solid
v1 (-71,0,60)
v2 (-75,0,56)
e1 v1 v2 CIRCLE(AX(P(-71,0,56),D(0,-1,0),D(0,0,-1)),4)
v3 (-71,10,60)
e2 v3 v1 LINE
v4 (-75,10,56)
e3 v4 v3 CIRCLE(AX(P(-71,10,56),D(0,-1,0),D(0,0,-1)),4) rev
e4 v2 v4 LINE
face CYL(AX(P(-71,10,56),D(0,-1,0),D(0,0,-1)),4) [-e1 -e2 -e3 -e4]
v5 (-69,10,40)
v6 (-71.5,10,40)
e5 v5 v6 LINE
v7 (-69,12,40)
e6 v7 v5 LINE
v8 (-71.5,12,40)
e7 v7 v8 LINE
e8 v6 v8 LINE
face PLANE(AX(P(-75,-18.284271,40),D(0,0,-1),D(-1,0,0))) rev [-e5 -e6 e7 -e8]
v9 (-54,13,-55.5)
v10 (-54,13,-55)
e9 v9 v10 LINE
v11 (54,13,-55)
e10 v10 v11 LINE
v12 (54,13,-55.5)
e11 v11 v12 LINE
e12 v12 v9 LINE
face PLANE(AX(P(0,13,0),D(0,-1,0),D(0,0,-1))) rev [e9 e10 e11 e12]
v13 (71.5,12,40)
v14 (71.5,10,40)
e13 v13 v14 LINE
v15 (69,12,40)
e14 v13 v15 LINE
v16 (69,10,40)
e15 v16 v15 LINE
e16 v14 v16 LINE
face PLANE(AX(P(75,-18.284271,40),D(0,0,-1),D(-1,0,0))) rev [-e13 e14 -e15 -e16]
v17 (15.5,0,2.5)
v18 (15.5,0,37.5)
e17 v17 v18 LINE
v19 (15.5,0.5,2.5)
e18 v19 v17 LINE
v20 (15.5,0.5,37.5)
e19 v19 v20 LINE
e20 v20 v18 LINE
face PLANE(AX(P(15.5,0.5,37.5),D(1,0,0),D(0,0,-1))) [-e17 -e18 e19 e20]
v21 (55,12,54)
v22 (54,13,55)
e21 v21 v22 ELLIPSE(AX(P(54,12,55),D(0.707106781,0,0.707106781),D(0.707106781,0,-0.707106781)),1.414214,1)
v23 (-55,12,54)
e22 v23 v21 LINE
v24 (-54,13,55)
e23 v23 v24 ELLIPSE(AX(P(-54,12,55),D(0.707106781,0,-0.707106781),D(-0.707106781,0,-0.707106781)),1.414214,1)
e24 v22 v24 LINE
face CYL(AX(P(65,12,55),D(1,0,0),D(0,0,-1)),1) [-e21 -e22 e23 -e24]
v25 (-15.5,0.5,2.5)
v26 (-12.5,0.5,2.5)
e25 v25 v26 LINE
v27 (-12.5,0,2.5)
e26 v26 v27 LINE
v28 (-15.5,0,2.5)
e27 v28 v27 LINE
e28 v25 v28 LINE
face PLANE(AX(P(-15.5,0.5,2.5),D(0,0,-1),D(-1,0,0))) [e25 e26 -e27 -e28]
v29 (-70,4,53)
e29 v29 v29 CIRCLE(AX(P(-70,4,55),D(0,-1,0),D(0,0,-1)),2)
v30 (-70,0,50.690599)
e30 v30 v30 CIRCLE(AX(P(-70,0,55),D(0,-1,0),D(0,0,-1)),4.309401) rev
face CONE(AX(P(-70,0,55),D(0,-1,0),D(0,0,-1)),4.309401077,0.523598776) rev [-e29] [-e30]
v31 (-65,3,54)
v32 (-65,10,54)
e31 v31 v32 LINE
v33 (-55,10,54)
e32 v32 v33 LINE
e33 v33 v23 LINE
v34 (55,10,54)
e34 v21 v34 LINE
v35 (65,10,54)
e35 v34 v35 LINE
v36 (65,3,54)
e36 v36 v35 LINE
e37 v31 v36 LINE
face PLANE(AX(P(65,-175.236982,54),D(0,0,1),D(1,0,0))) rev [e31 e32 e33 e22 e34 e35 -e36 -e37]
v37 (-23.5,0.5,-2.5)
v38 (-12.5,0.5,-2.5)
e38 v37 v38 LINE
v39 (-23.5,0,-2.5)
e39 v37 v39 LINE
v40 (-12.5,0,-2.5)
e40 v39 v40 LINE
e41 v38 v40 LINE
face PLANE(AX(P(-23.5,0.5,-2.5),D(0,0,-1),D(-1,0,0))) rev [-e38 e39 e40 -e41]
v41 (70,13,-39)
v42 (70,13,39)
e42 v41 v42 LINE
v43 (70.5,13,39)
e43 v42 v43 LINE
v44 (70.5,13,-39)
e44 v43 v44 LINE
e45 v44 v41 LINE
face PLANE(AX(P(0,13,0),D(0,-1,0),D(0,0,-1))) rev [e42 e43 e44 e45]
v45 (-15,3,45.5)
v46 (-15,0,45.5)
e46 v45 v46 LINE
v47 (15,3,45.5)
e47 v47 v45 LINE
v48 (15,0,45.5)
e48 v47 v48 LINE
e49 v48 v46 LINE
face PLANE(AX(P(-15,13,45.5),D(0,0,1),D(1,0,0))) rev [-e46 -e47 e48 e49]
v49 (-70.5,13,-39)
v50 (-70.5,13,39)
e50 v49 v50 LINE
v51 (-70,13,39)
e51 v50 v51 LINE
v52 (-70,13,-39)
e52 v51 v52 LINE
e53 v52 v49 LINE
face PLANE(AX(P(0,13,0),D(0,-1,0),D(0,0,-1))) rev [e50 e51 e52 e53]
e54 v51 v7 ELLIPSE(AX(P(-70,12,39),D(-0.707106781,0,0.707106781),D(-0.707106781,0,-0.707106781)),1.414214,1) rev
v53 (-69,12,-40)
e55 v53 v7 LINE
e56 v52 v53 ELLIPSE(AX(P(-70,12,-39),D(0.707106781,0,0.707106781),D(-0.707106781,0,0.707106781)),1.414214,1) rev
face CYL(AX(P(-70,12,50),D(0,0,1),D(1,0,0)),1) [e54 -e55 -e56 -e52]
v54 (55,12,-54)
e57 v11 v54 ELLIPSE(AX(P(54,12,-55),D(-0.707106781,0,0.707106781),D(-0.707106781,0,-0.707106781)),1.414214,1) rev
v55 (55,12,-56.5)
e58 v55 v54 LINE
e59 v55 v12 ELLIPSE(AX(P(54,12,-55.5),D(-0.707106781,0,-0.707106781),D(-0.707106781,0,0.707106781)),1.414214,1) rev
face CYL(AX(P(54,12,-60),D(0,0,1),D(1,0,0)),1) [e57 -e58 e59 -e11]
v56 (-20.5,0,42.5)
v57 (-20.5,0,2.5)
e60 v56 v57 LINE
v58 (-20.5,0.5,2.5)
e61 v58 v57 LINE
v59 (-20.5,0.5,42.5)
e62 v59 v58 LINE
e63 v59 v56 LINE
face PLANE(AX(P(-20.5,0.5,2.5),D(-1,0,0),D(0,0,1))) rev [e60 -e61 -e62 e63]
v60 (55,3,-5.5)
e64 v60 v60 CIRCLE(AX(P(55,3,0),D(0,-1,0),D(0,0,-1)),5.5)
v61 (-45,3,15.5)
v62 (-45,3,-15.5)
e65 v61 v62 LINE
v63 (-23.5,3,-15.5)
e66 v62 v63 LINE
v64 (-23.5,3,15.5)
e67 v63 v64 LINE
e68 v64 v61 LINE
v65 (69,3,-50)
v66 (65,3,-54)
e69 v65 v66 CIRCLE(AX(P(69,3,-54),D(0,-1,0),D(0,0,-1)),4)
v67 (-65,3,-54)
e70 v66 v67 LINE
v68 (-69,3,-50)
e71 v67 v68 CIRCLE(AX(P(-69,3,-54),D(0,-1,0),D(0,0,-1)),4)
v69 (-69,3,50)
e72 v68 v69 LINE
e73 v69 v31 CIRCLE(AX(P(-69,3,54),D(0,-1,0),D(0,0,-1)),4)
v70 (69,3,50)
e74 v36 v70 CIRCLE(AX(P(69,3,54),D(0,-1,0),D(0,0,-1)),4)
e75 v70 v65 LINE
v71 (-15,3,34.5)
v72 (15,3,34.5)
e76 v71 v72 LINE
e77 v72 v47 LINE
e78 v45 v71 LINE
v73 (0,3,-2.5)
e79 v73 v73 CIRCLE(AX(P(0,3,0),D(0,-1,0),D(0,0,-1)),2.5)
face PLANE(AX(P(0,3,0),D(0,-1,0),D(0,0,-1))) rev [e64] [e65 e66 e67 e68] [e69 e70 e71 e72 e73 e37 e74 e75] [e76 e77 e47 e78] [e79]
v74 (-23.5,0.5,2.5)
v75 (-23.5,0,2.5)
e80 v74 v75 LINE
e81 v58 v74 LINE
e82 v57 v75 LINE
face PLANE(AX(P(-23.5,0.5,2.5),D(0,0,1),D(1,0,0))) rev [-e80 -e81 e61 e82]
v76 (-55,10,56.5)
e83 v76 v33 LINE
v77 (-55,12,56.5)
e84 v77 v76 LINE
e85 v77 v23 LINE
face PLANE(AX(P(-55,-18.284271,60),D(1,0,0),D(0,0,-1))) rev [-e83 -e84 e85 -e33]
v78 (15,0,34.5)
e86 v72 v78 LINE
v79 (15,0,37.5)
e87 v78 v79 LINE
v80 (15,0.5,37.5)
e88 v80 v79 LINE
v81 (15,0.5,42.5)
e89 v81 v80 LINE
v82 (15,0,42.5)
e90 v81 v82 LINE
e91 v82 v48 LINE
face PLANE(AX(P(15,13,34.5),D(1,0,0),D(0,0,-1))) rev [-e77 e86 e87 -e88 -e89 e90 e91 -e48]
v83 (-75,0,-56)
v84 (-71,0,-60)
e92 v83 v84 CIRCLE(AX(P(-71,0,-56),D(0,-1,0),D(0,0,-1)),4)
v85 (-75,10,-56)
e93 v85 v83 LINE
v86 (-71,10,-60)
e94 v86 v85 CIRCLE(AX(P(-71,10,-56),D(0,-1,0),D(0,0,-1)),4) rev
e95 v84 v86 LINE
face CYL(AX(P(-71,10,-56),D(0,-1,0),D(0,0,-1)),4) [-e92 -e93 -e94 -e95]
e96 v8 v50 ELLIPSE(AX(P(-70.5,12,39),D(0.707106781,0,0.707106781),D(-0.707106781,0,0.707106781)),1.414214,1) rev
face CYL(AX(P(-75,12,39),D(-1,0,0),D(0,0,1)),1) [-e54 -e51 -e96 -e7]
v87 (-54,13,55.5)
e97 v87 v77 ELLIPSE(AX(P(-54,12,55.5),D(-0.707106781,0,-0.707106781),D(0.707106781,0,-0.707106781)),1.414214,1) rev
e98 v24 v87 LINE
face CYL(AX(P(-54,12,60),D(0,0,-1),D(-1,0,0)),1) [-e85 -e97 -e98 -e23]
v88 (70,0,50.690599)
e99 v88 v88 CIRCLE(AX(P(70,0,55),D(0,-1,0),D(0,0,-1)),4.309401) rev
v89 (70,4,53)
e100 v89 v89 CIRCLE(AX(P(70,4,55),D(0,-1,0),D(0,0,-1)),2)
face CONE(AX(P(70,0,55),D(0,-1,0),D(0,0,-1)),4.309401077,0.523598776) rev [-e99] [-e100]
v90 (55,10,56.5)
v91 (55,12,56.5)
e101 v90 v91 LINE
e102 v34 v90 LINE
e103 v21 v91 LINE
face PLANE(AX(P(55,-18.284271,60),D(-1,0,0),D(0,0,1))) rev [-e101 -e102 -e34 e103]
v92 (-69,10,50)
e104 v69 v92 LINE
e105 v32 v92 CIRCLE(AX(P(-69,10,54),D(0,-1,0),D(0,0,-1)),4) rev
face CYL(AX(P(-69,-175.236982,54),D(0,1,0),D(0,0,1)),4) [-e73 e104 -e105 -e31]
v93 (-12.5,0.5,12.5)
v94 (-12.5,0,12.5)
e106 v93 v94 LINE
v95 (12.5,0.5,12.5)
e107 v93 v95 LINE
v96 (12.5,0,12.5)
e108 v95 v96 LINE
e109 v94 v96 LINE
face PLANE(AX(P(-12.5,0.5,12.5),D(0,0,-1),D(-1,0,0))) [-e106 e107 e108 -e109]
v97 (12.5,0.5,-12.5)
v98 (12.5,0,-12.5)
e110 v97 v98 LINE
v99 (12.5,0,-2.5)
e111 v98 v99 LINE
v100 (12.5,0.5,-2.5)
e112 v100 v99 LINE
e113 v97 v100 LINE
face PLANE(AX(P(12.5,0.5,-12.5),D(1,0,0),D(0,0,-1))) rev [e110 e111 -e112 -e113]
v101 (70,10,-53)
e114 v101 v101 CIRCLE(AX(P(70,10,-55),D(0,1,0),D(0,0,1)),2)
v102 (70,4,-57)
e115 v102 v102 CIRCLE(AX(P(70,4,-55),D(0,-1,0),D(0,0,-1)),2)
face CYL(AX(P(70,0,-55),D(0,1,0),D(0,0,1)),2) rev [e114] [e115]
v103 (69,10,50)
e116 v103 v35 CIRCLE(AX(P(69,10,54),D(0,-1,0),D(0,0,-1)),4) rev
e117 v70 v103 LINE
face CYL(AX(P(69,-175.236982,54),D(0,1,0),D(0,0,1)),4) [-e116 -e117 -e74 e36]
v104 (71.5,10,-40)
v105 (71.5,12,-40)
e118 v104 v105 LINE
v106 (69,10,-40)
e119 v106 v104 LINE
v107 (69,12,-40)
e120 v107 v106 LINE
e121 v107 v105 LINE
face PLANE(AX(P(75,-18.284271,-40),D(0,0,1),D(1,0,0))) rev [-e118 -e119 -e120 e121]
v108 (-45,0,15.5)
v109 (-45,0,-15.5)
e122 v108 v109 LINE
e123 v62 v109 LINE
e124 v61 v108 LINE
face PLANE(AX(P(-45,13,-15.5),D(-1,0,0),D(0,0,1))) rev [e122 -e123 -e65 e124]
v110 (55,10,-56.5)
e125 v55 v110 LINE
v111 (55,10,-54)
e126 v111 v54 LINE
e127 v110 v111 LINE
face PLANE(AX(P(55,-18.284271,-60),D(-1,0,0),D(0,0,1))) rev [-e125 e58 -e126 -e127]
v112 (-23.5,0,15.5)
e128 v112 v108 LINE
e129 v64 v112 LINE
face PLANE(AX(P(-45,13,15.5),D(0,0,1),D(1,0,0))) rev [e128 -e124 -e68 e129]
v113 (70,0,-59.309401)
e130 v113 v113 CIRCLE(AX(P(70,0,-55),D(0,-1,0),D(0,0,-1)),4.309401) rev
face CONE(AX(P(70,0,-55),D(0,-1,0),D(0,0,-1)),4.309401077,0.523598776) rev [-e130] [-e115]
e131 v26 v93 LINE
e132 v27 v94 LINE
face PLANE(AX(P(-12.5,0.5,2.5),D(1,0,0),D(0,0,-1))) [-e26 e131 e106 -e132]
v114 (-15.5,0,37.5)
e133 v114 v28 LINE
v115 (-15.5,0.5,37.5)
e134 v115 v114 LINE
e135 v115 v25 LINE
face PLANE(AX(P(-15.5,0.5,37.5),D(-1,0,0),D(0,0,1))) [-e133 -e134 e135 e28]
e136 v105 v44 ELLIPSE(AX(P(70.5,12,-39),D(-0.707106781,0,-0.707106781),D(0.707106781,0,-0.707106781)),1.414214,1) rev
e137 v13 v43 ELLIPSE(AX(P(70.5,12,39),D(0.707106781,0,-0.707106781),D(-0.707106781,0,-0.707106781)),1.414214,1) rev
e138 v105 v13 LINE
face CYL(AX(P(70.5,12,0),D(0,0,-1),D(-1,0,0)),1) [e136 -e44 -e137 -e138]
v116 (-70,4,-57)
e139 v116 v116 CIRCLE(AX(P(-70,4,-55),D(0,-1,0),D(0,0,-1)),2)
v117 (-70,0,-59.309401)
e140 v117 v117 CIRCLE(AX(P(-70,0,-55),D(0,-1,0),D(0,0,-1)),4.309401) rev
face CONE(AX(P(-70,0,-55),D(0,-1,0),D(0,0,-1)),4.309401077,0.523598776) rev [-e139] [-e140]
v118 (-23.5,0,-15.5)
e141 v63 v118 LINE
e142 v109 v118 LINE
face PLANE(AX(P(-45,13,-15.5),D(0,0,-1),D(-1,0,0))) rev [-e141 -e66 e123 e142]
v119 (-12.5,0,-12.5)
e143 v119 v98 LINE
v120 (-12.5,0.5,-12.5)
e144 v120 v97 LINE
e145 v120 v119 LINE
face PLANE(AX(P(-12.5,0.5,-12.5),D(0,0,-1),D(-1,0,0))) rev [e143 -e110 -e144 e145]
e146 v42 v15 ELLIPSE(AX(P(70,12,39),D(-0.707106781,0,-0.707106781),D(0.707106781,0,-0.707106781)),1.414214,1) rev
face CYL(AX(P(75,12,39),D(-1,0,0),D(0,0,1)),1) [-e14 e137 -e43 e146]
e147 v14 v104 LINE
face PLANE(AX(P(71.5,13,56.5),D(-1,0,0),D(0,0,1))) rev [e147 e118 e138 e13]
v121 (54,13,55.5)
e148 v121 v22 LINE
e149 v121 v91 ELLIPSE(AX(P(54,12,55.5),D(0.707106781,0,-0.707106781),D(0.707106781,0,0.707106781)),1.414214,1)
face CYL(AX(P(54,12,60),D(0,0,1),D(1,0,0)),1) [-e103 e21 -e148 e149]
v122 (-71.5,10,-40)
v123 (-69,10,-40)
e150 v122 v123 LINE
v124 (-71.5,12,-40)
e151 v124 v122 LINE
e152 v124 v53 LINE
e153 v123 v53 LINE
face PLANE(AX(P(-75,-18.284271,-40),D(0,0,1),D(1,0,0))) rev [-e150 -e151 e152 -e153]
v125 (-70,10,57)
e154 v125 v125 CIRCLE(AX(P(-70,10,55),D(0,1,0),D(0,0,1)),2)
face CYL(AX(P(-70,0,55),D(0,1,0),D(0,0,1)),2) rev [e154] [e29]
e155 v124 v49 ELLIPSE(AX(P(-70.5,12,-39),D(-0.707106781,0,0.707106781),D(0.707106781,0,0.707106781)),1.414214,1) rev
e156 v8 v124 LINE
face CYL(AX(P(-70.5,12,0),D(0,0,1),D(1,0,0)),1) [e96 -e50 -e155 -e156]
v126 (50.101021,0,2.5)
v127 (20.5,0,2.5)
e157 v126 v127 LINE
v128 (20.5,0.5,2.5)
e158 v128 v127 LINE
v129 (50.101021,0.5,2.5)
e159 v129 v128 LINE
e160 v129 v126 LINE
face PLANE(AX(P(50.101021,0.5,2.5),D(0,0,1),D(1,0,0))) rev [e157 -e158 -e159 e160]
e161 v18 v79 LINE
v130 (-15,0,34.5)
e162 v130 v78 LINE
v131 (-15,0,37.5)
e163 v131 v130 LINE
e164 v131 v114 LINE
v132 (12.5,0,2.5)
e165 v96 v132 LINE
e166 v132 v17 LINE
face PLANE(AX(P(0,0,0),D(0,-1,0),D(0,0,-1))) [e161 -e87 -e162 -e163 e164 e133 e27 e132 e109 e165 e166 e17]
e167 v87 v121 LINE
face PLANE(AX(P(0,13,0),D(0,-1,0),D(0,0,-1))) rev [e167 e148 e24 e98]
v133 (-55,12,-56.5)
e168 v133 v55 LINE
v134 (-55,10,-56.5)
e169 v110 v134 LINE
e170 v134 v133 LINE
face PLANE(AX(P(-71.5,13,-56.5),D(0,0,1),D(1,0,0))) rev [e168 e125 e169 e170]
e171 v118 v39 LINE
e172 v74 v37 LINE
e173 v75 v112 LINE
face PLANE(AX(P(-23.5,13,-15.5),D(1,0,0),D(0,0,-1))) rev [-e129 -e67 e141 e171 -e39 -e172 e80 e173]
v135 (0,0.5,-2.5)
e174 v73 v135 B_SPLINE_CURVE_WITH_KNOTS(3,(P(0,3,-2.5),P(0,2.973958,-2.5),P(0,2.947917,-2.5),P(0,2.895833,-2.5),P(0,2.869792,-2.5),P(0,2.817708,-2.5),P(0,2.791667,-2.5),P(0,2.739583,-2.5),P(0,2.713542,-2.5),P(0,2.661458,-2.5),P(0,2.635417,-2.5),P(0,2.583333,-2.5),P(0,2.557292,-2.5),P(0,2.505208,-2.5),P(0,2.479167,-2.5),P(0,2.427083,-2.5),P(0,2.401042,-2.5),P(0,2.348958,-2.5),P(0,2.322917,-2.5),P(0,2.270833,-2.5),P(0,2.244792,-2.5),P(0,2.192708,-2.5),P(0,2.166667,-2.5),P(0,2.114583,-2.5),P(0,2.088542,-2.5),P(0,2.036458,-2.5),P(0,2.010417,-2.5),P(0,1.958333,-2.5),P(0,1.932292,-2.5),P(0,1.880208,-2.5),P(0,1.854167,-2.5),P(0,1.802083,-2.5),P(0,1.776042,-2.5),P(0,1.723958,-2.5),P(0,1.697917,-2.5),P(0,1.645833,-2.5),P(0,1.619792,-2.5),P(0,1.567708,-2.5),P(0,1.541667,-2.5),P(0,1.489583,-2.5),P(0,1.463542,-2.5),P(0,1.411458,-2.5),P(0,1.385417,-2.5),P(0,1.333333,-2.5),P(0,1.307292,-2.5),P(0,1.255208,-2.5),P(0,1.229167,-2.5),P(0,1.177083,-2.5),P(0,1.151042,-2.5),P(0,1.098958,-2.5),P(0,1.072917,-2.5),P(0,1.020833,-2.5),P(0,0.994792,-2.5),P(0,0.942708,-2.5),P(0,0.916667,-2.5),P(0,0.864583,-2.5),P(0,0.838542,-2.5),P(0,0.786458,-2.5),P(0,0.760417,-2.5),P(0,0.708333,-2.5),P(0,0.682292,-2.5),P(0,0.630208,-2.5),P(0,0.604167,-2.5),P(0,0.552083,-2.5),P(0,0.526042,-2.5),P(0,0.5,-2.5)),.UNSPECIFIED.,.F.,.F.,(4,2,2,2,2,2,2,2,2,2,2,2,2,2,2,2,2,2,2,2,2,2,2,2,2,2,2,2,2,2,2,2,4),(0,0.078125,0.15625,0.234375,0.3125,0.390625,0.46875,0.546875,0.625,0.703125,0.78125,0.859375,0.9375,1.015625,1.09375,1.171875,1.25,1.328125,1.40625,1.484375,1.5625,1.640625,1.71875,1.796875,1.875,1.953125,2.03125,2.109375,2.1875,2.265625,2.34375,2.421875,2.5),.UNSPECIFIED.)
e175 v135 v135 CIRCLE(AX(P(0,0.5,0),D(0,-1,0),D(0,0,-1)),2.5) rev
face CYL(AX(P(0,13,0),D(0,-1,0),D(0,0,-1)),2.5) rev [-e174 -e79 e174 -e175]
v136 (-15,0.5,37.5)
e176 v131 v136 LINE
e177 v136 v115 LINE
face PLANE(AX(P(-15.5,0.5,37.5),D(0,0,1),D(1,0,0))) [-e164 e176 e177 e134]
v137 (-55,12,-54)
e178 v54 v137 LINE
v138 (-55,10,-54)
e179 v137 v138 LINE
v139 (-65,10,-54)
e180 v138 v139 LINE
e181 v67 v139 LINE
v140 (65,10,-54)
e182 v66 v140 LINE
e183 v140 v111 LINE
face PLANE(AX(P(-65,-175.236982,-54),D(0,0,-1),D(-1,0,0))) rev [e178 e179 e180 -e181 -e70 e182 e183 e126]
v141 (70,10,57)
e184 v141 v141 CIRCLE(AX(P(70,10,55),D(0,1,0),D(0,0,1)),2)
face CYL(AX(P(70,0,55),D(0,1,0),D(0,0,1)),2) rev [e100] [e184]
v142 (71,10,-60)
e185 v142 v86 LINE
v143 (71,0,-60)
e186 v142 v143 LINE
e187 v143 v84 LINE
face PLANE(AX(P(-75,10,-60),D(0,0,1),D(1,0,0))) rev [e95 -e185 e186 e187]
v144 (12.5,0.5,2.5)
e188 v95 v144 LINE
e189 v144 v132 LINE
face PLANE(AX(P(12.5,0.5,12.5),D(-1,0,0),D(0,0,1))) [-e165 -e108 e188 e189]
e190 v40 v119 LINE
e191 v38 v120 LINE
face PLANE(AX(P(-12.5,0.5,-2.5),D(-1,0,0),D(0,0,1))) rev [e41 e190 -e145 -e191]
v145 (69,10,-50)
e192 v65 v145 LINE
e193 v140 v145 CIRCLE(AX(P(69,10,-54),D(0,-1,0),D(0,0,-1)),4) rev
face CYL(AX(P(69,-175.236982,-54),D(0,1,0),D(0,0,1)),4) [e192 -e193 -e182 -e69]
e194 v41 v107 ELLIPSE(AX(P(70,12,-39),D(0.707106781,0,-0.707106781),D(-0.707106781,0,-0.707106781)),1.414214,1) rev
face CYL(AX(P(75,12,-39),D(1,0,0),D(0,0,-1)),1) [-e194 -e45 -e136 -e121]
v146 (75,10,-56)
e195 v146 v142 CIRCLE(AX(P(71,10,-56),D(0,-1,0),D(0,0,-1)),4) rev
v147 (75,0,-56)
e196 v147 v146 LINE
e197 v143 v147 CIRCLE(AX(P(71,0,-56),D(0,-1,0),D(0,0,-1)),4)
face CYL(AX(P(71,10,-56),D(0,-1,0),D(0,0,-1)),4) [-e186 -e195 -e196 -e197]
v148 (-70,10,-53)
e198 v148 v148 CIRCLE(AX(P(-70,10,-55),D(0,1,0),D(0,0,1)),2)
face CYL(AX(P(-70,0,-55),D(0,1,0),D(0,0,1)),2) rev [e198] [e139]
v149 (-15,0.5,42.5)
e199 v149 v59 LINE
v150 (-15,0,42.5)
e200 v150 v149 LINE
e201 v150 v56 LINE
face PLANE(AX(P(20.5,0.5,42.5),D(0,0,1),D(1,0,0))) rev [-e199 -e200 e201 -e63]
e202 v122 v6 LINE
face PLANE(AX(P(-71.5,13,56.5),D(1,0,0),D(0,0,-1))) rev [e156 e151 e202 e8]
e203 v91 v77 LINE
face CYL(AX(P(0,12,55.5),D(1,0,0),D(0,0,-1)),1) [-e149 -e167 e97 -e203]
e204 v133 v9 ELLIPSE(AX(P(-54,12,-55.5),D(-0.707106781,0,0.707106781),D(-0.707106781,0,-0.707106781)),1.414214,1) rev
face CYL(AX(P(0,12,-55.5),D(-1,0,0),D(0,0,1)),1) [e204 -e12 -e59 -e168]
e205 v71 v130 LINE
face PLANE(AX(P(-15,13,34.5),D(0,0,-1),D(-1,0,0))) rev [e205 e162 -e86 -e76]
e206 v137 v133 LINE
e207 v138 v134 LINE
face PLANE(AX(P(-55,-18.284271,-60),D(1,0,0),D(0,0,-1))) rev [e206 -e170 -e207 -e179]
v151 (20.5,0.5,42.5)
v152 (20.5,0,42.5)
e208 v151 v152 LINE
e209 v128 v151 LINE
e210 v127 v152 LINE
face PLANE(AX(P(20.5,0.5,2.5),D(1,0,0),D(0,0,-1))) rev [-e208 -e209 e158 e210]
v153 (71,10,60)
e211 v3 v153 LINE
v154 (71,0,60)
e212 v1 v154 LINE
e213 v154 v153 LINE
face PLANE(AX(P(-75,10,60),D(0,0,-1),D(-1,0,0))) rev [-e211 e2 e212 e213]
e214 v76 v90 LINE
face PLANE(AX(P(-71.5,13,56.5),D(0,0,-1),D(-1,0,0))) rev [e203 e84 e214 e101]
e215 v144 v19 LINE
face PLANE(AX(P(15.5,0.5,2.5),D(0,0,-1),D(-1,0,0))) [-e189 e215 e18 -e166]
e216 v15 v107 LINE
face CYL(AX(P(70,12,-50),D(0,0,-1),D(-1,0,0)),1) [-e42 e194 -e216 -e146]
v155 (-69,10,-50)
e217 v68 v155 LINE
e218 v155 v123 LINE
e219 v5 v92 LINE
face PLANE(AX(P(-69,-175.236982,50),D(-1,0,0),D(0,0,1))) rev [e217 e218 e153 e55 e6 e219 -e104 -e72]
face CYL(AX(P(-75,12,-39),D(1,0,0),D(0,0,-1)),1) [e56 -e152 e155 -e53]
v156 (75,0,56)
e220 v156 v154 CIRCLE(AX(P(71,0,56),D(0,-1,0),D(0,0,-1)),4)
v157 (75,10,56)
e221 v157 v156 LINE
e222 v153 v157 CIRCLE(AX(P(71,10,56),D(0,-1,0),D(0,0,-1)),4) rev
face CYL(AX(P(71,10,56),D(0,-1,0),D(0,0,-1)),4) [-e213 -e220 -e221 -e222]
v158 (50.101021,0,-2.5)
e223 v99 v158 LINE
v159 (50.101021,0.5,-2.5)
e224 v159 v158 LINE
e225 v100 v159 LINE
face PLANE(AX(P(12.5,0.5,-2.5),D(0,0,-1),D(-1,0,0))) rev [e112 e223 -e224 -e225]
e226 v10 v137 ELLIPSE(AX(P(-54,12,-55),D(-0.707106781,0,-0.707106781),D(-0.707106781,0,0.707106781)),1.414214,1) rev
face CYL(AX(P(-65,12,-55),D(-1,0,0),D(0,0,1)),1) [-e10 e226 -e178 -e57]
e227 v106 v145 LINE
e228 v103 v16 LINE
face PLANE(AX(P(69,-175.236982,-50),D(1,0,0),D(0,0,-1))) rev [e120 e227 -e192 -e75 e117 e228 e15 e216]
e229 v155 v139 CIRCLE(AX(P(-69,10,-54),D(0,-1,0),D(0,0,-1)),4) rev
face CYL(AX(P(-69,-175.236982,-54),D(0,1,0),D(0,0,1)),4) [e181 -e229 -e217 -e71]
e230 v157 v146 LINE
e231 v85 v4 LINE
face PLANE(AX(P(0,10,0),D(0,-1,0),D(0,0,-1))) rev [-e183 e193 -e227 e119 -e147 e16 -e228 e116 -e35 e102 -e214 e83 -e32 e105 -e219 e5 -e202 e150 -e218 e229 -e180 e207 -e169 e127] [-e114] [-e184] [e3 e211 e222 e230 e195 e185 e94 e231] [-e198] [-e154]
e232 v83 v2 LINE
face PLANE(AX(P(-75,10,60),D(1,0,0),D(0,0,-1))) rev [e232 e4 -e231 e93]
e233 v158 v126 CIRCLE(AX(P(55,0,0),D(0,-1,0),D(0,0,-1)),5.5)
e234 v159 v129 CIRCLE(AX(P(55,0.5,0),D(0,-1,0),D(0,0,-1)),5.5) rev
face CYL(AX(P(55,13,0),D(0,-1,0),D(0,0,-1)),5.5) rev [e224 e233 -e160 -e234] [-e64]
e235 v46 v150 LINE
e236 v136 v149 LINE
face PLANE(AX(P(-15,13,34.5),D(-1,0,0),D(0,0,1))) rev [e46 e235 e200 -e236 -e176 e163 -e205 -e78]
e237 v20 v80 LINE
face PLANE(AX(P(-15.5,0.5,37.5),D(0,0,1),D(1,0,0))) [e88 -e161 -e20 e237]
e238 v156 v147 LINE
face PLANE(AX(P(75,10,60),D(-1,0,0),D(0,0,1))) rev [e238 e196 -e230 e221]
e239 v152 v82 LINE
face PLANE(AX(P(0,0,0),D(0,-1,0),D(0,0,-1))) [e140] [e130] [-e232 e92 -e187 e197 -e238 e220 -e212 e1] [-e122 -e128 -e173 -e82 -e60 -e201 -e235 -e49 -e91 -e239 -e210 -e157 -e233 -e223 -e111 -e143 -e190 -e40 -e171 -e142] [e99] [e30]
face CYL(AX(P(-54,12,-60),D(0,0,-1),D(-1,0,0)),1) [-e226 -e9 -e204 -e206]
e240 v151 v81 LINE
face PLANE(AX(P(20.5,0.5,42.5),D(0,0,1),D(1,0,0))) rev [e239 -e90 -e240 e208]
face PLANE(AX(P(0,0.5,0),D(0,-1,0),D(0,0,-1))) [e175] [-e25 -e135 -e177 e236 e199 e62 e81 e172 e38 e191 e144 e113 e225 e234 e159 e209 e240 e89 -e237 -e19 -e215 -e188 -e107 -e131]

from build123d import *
from OCP.BRepFilletAPI import BRepFilletAPI_MakeChamfer

# Parameters (mm, degrees)
CROQUIS1_W              = 150
CROQUIS1_H              = 120
SALIENTE_EXTRUIR1_DEPTH = 10
CROQUIS2_W              = 143
CROQUIS2_H              = 113
SALIENTE_EXTRUIR2_DEPTH = 3
CORTAR_EXTRUIR4_DEPTH   = 10
CROQUIS5_W              = 20
CROQUIS5_H              = 20
CORTAR_EXTRUIR5_DEPTH   = 3
CROQUIS7_R              = 2
CORTAR_EXTRUIR6_DEPTH   = 97.566039579
CHAFL_N1_SIZE           = 4
CHAFL_N1_SIZE2          = 2.309401077
REDONDEO3_R             = 4
REDONDEO4_R             = 4
REDONDEO5_R             = 1
CROQUIS8_R              = 2.5
CROQUIS8_R_2            = 5.5
CROQUIS8_W              = 21.5
CROQUIS8_H              = 31
CROQUIS8_W_2            = 30
CROQUIS8_H_2            = 11
CORTAR_EXTRUIR7_DEPTH   = 97.922649572
CORTAR_EXTRUIR8_DEPTH   = 0.5


with BuildPart() as part:
    # Croquis1 → Saliente-Extruir1 (new body)
    with BuildSketch(Plane(origin=(0, 0, 0), x_dir=(1, 0, 0), z_dir=(0, 1, 0))):
        Rectangle(CROQUIS1_W, CROQUIS1_H)
    extrude(amount=SALIENTE_EXTRUIR1_DEPTH)

    # Croquis2 → Saliente-Extruir2 (add)
    with BuildSketch(Plane(origin=(0, 10, 0), x_dir=(1, 0, 0), z_dir=(0, 1, 0))):
        Rectangle(CROQUIS2_W, CROQUIS2_H)
    extrude(amount=SALIENTE_EXTRUIR2_DEPTH)

    # Croquis4 → Cortar-Extruir4 (cut)
    with BuildSketch(Plane(origin=(0, 13, 0), x_dir=(1, 0, 0), z_dir=(0, 1, 0))):
        Polygon((-65, 54), (65, 54), (65, 50), (69, 50), (69, -50), (65, -50), (65, -54), (-65, -54), (-65, -50), (-69, -50), (-69, 50), (-65, 50), align=None)
    extrude(amount=-CORTAR_EXTRUIR4_DEPTH, mode=Mode.SUBTRACT)

    # Croquis5 → Cortar-Extruir5 (cut)
    with BuildSketch(Plane(origin=(0, 13, 0), x_dir=(1, 0, 0), z_dir=(0, 1, 0))):
        with Locations((-65, 50)):
            Rectangle(CROQUIS5_W, CROQUIS5_H)
        with Locations((65, 50)):
            Rectangle(CROQUIS5_W, CROQUIS5_H)
        with Locations((65, -50)):
            Rectangle(CROQUIS5_W, CROQUIS5_H)
        with Locations((-65, -50)):
            Rectangle(CROQUIS5_W, CROQUIS5_H)
    extrude(amount=-CORTAR_EXTRUIR5_DEPTH, mode=Mode.SUBTRACT)

    # Croquis7 → Cortar-Extruir6 (cut, through all)
    with BuildSketch(Plane(origin=(0, 10, 0), x_dir=(1, 0, 0), z_dir=(0, 1, 0))):
        with Locations(Location((-70, 55, 0), (0, 0, 270))):
            Circle(CROQUIS7_R)
        with Locations(Location((70, 55, 0), (0, 0, 270))):
            Circle(CROQUIS7_R)
        with Locations(Location((70, -55, 0), (0, 0, 270))):
            Circle(CROQUIS7_R)
        with Locations(Location((-70, -55, 0), (0, 0, 270))):
            Circle(CROQUIS7_R)
    extrude(amount=-CORTAR_EXTRUIR6_DEPTH, mode=Mode.SUBTRACT)

    # Chaflán1: one chamfer whose edges measure the first distance from different faces: ONE call of the kernel's chamfer builder (chamfer() names one face for all edges)
    chafl_n1_edges_1 = [part.edges().sort_by_distance(p)[0] for p in [
        (70, 0, 53),
    ]]
    chafl_n1_side_1 = [part.faces().sort_by_distance(p)[0] for p in [
        (70, 5, 53),
    ]]
    chafl_n1_edges_2 = [part.edges().sort_by_distance(p)[0] for p in [
        (-70, 0, -57),
    ]]
    chafl_n1_side_2 = [part.faces().sort_by_distance(p)[0] for p in [
        (-70, 5, -57),
    ]]
    chafl_n1_edges_3 = [part.edges().sort_by_distance(p)[0] for p in [
        (-70, 0, 53),
    ]]
    chafl_n1_side_3 = [part.faces().sort_by_distance(p)[0] for p in [
        (-70, 5, 53),
    ]]
    chafl_n1_edges_4 = [part.edges().sort_by_distance(p)[0] for p in [
        (70, 0, -57),
    ]]
    chafl_n1_side_4 = [part.faces().sort_by_distance(p)[0] for p in [
        (70, 5, -57),
    ]]
    chafl_n1 = BRepFilletAPI_MakeChamfer(part.part.solid().wrapped)
    for e in chafl_n1_edges_1:
        chafl_n1.Add(CHAFL_N1_SIZE, CHAFL_N1_SIZE2, e.wrapped, chafl_n1_side_1[0].wrapped)  # the first distance lies on this face
    for e in chafl_n1_edges_2:
        chafl_n1.Add(CHAFL_N1_SIZE, CHAFL_N1_SIZE2, e.wrapped, chafl_n1_side_2[0].wrapped)  # the first distance lies on this face
    for e in chafl_n1_edges_3:
        chafl_n1.Add(CHAFL_N1_SIZE, CHAFL_N1_SIZE2, e.wrapped, chafl_n1_side_3[0].wrapped)  # the first distance lies on this face
    for e in chafl_n1_edges_4:
        chafl_n1.Add(CHAFL_N1_SIZE, CHAFL_N1_SIZE2, e.wrapped, chafl_n1_side_4[0].wrapped)  # the first distance lies on this face
    add(Compound.cast(chafl_n1.Shape()), mode=Mode.REPLACE)

    # Redondeo3
    redondeo3_edges = [part.edges().sort_by_distance(p)[0] for p in [
        (75, 5, 60),
        (-75, 5, 60),
        (-75, 5, -60),
        (75, 5, -60),
    ]]
    fillet(redondeo3_edges, radius=REDONDEO3_R)

    # Redondeo4
    redondeo4_edges = [part.edges().sort_by_distance(p)[0] for p in [
        (65, 6.5, -50),
        (65, 6.5, 50),
        (-65, 6.5, 50),
        (-65, 6.5, -50),
    ]]
    fillet(redondeo4_edges, radius=REDONDEO4_R - 0.0001)  # a hair under: the kernel refuses the full size

    # Redondeo5
    redondeo5_edges = [part.edges().sort_by_distance(p)[0] for p in [
        (70.25, 13, 40),
        (55, 13, 55.25),
        (55, 13, -55.25),
        (70.25, 13, -40),
        (-55, 13, -55.25),
        (-70.25, 13, -40),
        (0, 13, -54),
        (69, 13, 0),
        (0, 13, 54),
        (-69, 13, 0),
        (71.5, 13, 0),
        (0, 13, -56.5),
        (-71.5, 13, 0),
        (0, 13, 56.5),
        (-55, 13, 55.25),
        (-70.25, 13, 40),
    ]]
    fillet(redondeo5_edges, radius=REDONDEO5_R)

    # Croquis8 → Cortar-Extruir7 (cut, through all)
    with BuildSketch(Plane.XZ):
        with Locations(Location((0, 0, 0), (0, 0, 270))):
            Circle(CROQUIS8_R)
        with Locations(Location((55, 0, 0), (0, 0, 270))):
            Circle(CROQUIS8_R_2)
        with Locations((-34.25, 0)):
            Rectangle(CROQUIS8_W, CROQUIS8_H)
        with Locations((0, 40)):
            Rectangle(CROQUIS8_W_2, CROQUIS8_H_2)
    extrude(amount=-CORTAR_EXTRUIR7_DEPTH, mode=Mode.SUBTRACT)

    # Croquis9 → Cortar-Extruir8 (cut)
    with BuildSketch(Plane.XZ):
        Polygon((-23.5, 2.5), (-23.5, -2.5), (-12.5, -2.5), (-12.5, -12.5), (12.5, -12.5), (12.5, -2.5), (50.101020514, -2.5), (50.101020514, 2.5), (20.5, 2.5), (20.5, 42.5), (-20.5, 42.5), (-20.5, 2.5), align=None)
        Polygon((-12.5, 2.5), (-12.5, 12.5), (12.5, 12.5), (12.5, 2.5), (15.5, 2.5), (15.5, 37.5), (-15.5, 37.5), (-15.5, 2.5), align=None, mode=Mode.SUBTRACT)
    extrude(amount=-CORTAR_EXTRUIR8_DEPTH, mode=Mode.SUBTRACT)


solid = part.part
